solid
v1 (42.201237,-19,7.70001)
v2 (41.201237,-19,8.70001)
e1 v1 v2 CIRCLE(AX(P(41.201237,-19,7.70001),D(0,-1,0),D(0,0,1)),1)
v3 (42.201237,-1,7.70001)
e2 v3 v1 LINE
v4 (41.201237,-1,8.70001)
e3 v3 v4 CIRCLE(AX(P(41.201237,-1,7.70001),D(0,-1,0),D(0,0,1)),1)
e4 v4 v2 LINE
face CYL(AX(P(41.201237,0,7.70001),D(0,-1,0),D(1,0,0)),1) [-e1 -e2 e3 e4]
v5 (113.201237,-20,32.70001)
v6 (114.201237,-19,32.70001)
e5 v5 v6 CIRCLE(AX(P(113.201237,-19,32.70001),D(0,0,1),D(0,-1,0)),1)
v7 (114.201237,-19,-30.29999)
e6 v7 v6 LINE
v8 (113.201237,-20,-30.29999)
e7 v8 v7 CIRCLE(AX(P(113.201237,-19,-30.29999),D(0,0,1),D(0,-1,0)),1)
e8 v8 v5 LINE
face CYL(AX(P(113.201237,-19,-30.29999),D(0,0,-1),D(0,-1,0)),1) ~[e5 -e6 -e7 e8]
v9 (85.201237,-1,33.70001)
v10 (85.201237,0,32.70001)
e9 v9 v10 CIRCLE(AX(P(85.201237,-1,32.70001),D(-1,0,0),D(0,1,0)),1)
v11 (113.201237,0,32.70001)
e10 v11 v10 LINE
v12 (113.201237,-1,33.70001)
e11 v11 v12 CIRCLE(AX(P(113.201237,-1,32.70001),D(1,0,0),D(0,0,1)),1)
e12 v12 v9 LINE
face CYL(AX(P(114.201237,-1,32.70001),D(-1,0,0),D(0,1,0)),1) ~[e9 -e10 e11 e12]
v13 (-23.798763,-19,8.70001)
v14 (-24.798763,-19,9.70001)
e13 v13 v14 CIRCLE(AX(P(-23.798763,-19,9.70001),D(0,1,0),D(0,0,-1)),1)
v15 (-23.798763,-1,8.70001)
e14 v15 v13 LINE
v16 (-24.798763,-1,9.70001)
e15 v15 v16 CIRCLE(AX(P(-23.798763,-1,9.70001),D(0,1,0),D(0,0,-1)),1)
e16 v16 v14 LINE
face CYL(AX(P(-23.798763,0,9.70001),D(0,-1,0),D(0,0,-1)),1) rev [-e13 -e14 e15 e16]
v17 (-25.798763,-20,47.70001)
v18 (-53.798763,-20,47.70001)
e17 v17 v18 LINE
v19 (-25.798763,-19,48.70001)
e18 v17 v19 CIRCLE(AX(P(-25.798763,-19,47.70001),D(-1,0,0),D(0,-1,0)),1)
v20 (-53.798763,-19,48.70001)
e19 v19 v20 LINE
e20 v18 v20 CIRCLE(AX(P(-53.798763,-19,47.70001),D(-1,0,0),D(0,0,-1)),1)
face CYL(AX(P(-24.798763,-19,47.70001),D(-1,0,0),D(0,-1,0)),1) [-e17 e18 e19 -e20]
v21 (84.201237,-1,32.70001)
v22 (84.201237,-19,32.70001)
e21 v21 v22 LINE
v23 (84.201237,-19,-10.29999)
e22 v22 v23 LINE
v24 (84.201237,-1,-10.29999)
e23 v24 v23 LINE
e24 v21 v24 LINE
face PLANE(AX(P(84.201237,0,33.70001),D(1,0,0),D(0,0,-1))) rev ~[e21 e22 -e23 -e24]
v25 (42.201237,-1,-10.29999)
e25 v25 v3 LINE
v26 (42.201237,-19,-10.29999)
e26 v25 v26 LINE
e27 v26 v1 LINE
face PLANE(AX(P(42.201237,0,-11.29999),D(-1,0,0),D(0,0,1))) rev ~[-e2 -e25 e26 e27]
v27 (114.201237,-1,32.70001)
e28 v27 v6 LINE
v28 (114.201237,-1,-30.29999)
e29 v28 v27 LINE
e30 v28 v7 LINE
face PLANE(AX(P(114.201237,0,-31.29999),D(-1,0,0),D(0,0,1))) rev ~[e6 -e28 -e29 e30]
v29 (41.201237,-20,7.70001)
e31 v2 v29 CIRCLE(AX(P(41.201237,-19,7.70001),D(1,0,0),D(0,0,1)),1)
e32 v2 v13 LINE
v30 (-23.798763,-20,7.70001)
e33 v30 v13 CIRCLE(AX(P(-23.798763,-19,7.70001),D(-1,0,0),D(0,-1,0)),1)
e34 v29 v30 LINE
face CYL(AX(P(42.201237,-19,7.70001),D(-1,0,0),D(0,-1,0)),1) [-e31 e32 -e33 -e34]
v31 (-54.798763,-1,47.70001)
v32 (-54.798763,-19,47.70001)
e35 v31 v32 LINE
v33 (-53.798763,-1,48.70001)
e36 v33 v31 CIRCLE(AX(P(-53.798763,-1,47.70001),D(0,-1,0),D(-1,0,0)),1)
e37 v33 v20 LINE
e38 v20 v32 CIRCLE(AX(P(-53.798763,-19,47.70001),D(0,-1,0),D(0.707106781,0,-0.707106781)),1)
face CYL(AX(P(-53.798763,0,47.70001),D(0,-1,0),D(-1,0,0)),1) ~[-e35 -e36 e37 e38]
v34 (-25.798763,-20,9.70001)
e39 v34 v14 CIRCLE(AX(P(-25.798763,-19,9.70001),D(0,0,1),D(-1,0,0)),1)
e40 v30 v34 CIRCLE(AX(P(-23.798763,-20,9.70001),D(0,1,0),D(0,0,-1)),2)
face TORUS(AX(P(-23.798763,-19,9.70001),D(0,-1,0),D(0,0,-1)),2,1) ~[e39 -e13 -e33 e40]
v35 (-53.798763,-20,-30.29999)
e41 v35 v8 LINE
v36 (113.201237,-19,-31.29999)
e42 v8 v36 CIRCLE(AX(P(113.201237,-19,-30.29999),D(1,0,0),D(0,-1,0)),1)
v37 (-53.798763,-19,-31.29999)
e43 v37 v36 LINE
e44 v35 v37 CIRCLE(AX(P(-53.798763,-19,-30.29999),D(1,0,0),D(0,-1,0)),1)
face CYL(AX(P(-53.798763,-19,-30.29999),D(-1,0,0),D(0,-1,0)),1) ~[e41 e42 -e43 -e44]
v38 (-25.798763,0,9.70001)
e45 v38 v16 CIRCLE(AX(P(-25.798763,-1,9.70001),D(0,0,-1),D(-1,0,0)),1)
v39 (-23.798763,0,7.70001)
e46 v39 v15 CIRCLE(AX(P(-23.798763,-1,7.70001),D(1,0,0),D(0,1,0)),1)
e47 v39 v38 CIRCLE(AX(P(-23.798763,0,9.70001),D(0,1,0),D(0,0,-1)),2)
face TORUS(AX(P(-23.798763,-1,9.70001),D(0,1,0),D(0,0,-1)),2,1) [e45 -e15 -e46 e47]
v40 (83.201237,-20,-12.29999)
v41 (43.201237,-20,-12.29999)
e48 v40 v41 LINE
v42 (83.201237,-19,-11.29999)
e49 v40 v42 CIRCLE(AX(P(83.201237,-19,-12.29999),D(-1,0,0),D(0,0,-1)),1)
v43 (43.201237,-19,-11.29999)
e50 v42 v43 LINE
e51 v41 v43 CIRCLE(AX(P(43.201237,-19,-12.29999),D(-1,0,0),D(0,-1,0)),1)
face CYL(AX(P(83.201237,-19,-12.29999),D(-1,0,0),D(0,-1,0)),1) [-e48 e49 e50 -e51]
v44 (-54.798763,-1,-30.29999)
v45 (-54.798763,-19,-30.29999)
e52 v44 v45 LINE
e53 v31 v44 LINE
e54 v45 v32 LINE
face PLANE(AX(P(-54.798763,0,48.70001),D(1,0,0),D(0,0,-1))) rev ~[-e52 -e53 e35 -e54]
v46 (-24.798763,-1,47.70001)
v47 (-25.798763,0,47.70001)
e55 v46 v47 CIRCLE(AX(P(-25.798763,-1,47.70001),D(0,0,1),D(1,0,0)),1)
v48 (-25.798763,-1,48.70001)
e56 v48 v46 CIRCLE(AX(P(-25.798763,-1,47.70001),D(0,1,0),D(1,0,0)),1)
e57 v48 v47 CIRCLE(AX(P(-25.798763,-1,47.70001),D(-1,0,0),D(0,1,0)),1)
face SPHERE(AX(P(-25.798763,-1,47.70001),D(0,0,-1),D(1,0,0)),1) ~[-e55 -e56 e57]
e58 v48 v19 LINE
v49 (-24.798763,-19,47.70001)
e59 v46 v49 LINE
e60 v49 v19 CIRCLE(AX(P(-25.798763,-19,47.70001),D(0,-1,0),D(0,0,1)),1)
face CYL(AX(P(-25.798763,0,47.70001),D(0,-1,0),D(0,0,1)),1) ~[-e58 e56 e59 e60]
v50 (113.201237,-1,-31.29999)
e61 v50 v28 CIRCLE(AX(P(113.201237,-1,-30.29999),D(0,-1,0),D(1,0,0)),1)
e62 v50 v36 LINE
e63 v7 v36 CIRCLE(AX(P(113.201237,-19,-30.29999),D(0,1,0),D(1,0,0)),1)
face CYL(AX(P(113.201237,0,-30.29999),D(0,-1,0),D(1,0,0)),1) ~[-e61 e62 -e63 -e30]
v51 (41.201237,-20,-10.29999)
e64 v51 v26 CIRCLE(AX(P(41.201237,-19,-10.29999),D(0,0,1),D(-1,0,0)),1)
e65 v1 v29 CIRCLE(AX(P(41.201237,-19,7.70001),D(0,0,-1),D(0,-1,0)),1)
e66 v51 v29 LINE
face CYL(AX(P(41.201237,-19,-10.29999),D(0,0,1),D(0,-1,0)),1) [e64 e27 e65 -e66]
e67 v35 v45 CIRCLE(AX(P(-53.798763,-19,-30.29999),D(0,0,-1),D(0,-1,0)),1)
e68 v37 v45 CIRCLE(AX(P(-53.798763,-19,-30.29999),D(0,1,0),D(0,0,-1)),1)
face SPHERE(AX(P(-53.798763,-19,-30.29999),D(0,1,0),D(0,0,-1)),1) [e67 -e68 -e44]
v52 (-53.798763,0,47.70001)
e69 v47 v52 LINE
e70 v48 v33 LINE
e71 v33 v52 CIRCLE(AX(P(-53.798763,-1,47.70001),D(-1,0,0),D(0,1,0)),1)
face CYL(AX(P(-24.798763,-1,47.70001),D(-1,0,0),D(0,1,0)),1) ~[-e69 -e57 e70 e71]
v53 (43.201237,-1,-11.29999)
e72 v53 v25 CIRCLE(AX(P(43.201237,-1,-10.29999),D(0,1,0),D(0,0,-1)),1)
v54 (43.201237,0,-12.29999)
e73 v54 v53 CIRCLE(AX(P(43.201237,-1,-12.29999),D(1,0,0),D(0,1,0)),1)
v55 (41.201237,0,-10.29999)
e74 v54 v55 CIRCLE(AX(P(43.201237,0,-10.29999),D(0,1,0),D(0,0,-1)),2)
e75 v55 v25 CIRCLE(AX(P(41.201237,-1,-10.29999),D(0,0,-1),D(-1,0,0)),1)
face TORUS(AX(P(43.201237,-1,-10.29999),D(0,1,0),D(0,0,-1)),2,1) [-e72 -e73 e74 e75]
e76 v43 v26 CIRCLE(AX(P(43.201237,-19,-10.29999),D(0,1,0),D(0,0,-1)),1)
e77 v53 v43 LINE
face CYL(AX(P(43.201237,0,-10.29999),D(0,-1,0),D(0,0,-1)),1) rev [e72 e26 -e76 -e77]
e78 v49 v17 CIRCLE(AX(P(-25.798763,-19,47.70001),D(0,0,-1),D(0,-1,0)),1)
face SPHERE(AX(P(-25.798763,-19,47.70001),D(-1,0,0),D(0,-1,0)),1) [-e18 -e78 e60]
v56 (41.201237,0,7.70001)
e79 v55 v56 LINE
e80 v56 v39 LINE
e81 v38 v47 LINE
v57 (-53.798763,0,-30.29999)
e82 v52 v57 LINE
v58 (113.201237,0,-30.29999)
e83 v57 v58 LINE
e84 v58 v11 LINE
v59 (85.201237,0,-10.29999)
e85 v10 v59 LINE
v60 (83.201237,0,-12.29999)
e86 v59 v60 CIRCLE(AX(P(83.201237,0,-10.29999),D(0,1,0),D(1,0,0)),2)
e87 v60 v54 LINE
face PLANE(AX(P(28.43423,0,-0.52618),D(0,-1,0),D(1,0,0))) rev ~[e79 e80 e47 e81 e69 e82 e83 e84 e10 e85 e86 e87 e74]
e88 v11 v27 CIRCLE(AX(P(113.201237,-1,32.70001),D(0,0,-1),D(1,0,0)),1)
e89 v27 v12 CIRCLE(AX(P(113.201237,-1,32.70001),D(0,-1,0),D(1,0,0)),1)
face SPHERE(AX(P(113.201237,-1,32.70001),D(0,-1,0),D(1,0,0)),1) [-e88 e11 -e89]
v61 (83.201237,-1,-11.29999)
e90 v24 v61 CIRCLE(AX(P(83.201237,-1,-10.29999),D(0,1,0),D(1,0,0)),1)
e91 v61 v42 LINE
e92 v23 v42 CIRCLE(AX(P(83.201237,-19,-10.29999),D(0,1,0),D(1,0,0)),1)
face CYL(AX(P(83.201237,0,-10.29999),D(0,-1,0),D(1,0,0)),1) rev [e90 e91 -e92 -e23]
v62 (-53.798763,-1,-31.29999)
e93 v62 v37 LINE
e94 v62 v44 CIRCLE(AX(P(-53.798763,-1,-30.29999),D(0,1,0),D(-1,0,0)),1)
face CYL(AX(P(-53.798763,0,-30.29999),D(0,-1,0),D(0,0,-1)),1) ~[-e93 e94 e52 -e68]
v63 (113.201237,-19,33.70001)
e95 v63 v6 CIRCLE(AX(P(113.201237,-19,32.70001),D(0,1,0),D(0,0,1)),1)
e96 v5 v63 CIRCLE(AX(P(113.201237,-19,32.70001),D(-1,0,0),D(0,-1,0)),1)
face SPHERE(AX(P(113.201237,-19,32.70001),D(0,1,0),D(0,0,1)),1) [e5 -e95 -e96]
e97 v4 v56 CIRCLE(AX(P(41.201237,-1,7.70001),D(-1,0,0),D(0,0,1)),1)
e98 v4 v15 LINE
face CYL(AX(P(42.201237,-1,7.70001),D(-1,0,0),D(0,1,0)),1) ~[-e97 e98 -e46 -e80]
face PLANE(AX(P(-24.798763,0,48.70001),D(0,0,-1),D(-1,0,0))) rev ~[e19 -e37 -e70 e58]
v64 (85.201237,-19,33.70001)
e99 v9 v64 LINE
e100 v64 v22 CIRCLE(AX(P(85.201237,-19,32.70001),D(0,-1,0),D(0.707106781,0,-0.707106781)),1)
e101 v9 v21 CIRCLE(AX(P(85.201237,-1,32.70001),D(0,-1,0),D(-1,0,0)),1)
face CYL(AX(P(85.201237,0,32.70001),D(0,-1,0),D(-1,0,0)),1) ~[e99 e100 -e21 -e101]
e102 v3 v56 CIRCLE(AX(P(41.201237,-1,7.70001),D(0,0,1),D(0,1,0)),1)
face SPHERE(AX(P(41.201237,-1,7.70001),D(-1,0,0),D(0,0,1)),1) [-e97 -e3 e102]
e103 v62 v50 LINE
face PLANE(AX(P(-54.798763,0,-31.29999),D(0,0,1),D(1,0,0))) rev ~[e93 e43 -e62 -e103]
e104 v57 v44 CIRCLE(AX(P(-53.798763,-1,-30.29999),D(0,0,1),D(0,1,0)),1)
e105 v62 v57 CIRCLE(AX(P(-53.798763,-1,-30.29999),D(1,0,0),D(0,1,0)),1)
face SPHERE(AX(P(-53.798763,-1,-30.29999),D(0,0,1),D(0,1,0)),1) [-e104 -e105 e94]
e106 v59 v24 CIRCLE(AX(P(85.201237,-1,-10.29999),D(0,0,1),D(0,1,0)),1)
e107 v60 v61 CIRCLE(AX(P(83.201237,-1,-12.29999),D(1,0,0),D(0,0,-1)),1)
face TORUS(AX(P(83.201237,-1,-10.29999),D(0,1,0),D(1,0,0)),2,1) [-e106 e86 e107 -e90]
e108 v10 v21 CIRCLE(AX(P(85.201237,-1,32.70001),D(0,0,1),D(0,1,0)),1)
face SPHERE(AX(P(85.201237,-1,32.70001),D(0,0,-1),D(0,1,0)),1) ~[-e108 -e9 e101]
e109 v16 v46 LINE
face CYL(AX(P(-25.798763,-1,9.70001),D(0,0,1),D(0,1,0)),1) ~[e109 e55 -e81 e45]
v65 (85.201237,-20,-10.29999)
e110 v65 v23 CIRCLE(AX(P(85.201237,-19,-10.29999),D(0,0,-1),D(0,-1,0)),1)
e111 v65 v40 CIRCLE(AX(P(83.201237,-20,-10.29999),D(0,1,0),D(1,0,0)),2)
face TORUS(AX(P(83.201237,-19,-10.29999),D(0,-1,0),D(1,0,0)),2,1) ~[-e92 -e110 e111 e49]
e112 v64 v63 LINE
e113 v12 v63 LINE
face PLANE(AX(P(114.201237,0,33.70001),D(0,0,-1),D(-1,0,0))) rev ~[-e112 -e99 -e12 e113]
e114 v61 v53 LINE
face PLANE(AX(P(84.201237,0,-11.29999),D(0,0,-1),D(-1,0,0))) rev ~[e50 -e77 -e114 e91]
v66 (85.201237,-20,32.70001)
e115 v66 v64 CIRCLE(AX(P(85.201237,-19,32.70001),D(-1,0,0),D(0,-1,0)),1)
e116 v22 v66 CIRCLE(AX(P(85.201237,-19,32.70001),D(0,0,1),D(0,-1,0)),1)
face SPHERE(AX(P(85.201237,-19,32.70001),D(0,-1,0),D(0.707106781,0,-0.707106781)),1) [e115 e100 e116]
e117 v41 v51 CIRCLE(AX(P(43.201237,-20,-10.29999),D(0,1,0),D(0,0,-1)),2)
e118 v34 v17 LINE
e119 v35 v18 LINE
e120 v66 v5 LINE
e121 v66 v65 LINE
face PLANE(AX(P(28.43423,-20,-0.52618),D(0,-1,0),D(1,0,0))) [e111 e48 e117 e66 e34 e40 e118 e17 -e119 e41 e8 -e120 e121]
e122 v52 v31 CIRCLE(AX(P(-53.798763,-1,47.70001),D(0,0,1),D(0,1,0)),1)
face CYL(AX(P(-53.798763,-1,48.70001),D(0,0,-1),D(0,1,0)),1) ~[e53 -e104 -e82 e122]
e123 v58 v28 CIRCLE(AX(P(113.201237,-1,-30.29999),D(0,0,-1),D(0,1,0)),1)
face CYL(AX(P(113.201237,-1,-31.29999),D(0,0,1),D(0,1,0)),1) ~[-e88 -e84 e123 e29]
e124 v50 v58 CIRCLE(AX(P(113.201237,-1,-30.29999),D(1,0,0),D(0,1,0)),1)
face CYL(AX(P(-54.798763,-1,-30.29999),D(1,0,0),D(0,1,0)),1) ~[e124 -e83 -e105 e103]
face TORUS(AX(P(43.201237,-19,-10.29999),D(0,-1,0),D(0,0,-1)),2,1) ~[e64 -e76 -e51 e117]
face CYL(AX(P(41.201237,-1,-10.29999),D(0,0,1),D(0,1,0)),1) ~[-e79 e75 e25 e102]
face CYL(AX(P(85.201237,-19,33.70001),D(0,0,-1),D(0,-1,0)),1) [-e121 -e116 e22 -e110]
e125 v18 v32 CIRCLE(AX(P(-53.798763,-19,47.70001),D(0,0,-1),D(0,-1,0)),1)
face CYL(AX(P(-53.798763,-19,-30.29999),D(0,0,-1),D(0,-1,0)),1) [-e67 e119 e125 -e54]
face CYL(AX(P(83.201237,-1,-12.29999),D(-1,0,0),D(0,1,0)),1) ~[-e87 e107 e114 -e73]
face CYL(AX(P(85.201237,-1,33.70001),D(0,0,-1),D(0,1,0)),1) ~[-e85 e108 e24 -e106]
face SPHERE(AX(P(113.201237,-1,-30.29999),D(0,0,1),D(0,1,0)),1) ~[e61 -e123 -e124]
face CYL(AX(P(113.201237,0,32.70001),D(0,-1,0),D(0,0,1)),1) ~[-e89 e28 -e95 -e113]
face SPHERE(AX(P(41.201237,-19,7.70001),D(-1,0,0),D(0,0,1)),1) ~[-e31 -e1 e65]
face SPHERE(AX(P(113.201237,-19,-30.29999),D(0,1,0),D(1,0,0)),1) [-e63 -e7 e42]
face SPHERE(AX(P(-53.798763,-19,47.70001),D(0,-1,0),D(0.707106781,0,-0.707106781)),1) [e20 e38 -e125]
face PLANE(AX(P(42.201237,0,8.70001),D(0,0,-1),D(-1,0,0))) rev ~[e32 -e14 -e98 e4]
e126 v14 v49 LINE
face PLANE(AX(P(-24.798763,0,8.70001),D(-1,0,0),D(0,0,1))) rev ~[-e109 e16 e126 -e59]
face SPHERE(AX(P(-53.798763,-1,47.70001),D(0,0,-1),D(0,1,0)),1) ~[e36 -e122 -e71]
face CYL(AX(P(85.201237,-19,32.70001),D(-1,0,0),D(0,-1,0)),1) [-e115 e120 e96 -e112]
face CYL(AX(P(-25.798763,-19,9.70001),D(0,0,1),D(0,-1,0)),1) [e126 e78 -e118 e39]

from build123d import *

# Parameters (mm, degrees)
F1_DEPTH     = 20
F2_F1_R      = 1
F2_F2_R      = 1
F3_T1_DEPTH  = 63
F3_T3_DEPTH  = 28
F3_T5_DEPTH  = 167
F3_T7_DEPTH  = 78
F3_S11_W     = 1
F3_S11_H     = 1
F3_T12_DEPTH = 1
F3_S17_W     = 1
F3_S17_H     = 1
F3_T18_DEPTH = 1
F3_T22_ANGLE = 90
F3_T24_ANGLE = 90
F3_T26_ANGLE = 90


# Not quite as in the source:
# - a fillet or chamfer that OpenCascade refuses, or shapes differently, is made with other operations: its cross-section is extruded or revolved along the edge and cut away or added


with BuildPart() as f1:
    # F0 (on Front) → F1 (new body)
    with BuildSketch(Plane.XZ):
        Polygon((-54.7987632453, 48.7000103295), (-54.7987632453, -31.2999896705), (114.2012367547, -31.2999896705), (114.2012367547, 33.7000103295), (84.2012367547, 33.7000103295), (84.2012367547, -11.2999896705), (42.2012367547, -11.2999896705), (42.2012367547, 8.7000103295), (-24.7987632453, 8.7000103295), (-24.7987632453, 48.7000103295), align=None)
    extrude(amount=F1_DEPTH)

    # F2: fillet of radius 1 on 24 edges, made by hand

    # F2_f1
    f2_f1_edges = [f1.edges().sort_by_distance(p)[0] for p in [
        (-24.7987632453, -10, 8.7000103295),
        (84.2012367547, -10, -11.2999896705),
        (42.2012367547, -10, -11.2999896705),
    ]]
    fillet(f2_f1_edges, radius=F2_F1_R)

    # F2_f2
    f2_f2_edges = [f1.edges().sort_by_distance(p)[0] for p in [
        (-39.7987632453, -20, 48.7000103295),
        (9.2012367547, -20, 8.7000103295),
        (-24.7987632453, -20, 29.2000103295),
        (9.2012367547, 0, 8.7000103295),
        (-24.7987632453, -10, 48.7000103295),
        (42.2012367547, -10, 8.7000103295),
        (42.2012367547, -20, -0.7999896705),
        (63.2012367547, 0, -11.2999896705),
        (63.2012367547, -20, -11.2999896705),
        (114.2012367547, -10, 33.7000103295),
        (114.2012367547, 0, 1.2000103295),
        (99.2012367547, 0, 33.7000103295),
        (84.2012367547, 0, 11.7000103295),
        (-54.7987632453, 0, 8.7000103295),
        (29.7012367547, 0, -31.2999896705),
        (-54.7987632453, -10, -31.2999896705),
        (84.2012367547, -10, 33.7000103295),
        (-24.7987632453, 0, 29.2000103295),
        (-39.7987632453, 0, 48.7000103295),
        (114.2012367547, -10, -31.2999896705),
        (-54.7987632453, -10, 48.7000103295),
        (-24.5058700265, 0, 8.9929035483),
        (83.9083435358, 0, -11.0070964517),
        (83.9083435358, -20, -11.0070964517),
        (42.4941299735, -20, -11.0070964517),
        (42.4941299735, 0, -11.0070964517),
        (-24.5058700265, -20, 8.9929035483),
    ]]
    fillet(f2_f2_edges, radius=F2_F2_R)

    # F3: fillet of radius 1 on 7 edges, made by hand

    # F3_s2 → F3_t1 (cut)
    with BuildSketch(Plane.XY.offset(-30.2999896705)):
        with BuildLine():
            ThreePointArc((113.2012367547, -20), (113.9083435358, -19.7071067812), (114.2012367547, -19))
            Line((114.2012367547, -19), (114.2012367547, -20))
            Line((114.2012367547, -20), (113.2012367547, -20))
        make_face()
    extrude(amount=F3_T1_DEPTH, mode=Mode.SUBTRACT)

    # F3_s4 → F3_t3 (cut)
    with BuildSketch(Plane.YZ.offset(85.2012367547)):
        with BuildLine():
            ThreePointArc((-20, 32.7000103295), (-19.7071067812, 33.4071171107), (-19, 33.7000103295))
            Line((-19, 33.7000103295), (-20, 33.7000103295))
            Line((-20, 33.7000103295), (-20, 32.7000103295))
        make_face()
    extrude(amount=F3_T3_DEPTH, mode=Mode.SUBTRACT)

    # F3_s6 → F3_t5 (cut)
    with BuildSketch(Plane.YZ.offset(-53.7987632453)):
        with BuildLine():
            ThreePointArc((-20, -30.2999896705), (-19.7071067812, -31.0070964517), (-19, -31.2999896705))
            Line((-19, -31.2999896705), (-20, -31.2999896705))
            Line((-20, -31.2999896705), (-20, -30.2999896705))
        make_face()
    extrude(amount=F3_T5_DEPTH, mode=Mode.SUBTRACT)

    # F3_s8 → F3_t7 (cut)
    with BuildSketch(Plane.XY.offset(-30.2999896705)):
        with BuildLine():
            ThreePointArc((-53.7987632453, -20), (-54.5058700265, -19.7071067812), (-54.7987632453, -19))
            Line((-54.7987632453, -19), (-54.7987632453, -20))
            Line((-54.7987632453, -20), (-53.7987632453, -20))
        make_face()
    extrude(amount=F3_T7_DEPTH, mode=Mode.SUBTRACT)


with BuildPart() as f3_tool10:
    # F3_s11 → F3_t12 (new body)
    with BuildSketch(Plane.XZ.offset(19)):
        with Locations((-54.2987632453, 48.2000103295)):
            Rectangle(F3_S11_W, F3_S11_H)
    extrude(amount=F3_T12_DEPTH)

    # F3_s13 → F3_t14 (revolve, cut)
    with BuildSketch(Plane(origin=(-53.7987632453, -19, 47.7000103295), x_dir=(0.7071067812, 0, -0.7071067812), z_dir=(-0.7071067812, 0, -0.7071067812))):
        with BuildLine():
            ThreePointArc((0, -1), (1, 0), (0, 1))
            Line((0, 1), (0, -1))
        make_face()
    revolve(axis=Axis((-53.7987632453, -19, 47.7000103295), (0, -1, 0)), mode=Mode.SUBTRACT)


with BuildPart() as f1_1:
    add(f1.part)

    # F3_t9: cut F3_tool10
    add(f3_tool10.part, mode=Mode.SUBTRACT)


with BuildPart() as f3_tool16:
    # F3_s17 → F3_t18 (new body)
    with BuildSketch(Plane.XZ.offset(19)):
        with Locations((84.7012367547, 33.2000103295)):
            Rectangle(F3_S17_W, F3_S17_H)
    extrude(amount=F3_T18_DEPTH)

    # F3_s19 → F3_t20 (revolve, cut)
    with BuildSketch(Plane(origin=(85.2012367547, -19, 32.7000103295), x_dir=(0.7071067812, 0, -0.7071067812), z_dir=(-0.7071067812, 0, -0.7071067812))):
        with BuildLine():
            ThreePointArc((0, -1), (1, 0), (0, 1))
            Line((0, 1), (0, -1))
        make_face()
    revolve(axis=Axis((85.2012367547, -19, 32.7000103295), (0, -1, 0)), mode=Mode.SUBTRACT)


with BuildPart() as f1_2:
    add(f1_1.part)

    # F3_t15: cut F3_tool16
    add(f3_tool16.part, mode=Mode.SUBTRACT)

    # F3_s21 → F3_t22 (revolve, cut)
    with BuildSketch(Plane.YZ.offset(113.2012367547)):
        with BuildLine():
            ThreePointArc((-20, 32.7000103295), (-19.7071067812, 33.4071171107), (-19, 33.7000103295))
            Line((-19, 33.7000103295), (-20, 33.7000103295))
            Line((-20, 33.7000103295), (-20, 32.7000103295))
        make_face()
    revolve(axis=Axis((113.2012367547, -20, 32.7000103295), (0, 1, 0)), revolution_arc=F3_T22_ANGLE, mode=Mode.SUBTRACT)

    # F3_s23 → F3_t24 (revolve, cut)
    with BuildSketch(Plane.XY.offset(-30.2999896705)):
        with BuildLine():
            ThreePointArc((113.2012367547, -20), (113.9083435358, -19.7071067812), (114.2012367547, -19))
            Line((114.2012367547, -19), (114.2012367547, -20))
            Line((114.2012367547, -20), (113.2012367547, -20))
        make_face()
    revolve(axis=Axis((113.2012367547, -20, -30.2999896705), (0, 1, 0)), revolution_arc=F3_T24_ANGLE, mode=Mode.SUBTRACT)

    # F3_s25 → F3_t26 (revolve, cut)
    with BuildSketch(Plane.YZ.offset(-53.7987632453)):
        with BuildLine():
            ThreePointArc((-20, -30.2999896705), (-19.7071067812, -31.0070964517), (-19, -31.2999896705))
            Line((-19, -31.2999896705), (-20, -31.2999896705))
            Line((-20, -31.2999896705), (-20, -30.2999896705))
        make_face()
    revolve(axis=Axis((-53.7987632453, -20, -30.2999896705), (0, 1, 0)), revolution_arc=F3_T26_ANGLE, mode=Mode.SUBTRACT)


solid = f1_2.part
